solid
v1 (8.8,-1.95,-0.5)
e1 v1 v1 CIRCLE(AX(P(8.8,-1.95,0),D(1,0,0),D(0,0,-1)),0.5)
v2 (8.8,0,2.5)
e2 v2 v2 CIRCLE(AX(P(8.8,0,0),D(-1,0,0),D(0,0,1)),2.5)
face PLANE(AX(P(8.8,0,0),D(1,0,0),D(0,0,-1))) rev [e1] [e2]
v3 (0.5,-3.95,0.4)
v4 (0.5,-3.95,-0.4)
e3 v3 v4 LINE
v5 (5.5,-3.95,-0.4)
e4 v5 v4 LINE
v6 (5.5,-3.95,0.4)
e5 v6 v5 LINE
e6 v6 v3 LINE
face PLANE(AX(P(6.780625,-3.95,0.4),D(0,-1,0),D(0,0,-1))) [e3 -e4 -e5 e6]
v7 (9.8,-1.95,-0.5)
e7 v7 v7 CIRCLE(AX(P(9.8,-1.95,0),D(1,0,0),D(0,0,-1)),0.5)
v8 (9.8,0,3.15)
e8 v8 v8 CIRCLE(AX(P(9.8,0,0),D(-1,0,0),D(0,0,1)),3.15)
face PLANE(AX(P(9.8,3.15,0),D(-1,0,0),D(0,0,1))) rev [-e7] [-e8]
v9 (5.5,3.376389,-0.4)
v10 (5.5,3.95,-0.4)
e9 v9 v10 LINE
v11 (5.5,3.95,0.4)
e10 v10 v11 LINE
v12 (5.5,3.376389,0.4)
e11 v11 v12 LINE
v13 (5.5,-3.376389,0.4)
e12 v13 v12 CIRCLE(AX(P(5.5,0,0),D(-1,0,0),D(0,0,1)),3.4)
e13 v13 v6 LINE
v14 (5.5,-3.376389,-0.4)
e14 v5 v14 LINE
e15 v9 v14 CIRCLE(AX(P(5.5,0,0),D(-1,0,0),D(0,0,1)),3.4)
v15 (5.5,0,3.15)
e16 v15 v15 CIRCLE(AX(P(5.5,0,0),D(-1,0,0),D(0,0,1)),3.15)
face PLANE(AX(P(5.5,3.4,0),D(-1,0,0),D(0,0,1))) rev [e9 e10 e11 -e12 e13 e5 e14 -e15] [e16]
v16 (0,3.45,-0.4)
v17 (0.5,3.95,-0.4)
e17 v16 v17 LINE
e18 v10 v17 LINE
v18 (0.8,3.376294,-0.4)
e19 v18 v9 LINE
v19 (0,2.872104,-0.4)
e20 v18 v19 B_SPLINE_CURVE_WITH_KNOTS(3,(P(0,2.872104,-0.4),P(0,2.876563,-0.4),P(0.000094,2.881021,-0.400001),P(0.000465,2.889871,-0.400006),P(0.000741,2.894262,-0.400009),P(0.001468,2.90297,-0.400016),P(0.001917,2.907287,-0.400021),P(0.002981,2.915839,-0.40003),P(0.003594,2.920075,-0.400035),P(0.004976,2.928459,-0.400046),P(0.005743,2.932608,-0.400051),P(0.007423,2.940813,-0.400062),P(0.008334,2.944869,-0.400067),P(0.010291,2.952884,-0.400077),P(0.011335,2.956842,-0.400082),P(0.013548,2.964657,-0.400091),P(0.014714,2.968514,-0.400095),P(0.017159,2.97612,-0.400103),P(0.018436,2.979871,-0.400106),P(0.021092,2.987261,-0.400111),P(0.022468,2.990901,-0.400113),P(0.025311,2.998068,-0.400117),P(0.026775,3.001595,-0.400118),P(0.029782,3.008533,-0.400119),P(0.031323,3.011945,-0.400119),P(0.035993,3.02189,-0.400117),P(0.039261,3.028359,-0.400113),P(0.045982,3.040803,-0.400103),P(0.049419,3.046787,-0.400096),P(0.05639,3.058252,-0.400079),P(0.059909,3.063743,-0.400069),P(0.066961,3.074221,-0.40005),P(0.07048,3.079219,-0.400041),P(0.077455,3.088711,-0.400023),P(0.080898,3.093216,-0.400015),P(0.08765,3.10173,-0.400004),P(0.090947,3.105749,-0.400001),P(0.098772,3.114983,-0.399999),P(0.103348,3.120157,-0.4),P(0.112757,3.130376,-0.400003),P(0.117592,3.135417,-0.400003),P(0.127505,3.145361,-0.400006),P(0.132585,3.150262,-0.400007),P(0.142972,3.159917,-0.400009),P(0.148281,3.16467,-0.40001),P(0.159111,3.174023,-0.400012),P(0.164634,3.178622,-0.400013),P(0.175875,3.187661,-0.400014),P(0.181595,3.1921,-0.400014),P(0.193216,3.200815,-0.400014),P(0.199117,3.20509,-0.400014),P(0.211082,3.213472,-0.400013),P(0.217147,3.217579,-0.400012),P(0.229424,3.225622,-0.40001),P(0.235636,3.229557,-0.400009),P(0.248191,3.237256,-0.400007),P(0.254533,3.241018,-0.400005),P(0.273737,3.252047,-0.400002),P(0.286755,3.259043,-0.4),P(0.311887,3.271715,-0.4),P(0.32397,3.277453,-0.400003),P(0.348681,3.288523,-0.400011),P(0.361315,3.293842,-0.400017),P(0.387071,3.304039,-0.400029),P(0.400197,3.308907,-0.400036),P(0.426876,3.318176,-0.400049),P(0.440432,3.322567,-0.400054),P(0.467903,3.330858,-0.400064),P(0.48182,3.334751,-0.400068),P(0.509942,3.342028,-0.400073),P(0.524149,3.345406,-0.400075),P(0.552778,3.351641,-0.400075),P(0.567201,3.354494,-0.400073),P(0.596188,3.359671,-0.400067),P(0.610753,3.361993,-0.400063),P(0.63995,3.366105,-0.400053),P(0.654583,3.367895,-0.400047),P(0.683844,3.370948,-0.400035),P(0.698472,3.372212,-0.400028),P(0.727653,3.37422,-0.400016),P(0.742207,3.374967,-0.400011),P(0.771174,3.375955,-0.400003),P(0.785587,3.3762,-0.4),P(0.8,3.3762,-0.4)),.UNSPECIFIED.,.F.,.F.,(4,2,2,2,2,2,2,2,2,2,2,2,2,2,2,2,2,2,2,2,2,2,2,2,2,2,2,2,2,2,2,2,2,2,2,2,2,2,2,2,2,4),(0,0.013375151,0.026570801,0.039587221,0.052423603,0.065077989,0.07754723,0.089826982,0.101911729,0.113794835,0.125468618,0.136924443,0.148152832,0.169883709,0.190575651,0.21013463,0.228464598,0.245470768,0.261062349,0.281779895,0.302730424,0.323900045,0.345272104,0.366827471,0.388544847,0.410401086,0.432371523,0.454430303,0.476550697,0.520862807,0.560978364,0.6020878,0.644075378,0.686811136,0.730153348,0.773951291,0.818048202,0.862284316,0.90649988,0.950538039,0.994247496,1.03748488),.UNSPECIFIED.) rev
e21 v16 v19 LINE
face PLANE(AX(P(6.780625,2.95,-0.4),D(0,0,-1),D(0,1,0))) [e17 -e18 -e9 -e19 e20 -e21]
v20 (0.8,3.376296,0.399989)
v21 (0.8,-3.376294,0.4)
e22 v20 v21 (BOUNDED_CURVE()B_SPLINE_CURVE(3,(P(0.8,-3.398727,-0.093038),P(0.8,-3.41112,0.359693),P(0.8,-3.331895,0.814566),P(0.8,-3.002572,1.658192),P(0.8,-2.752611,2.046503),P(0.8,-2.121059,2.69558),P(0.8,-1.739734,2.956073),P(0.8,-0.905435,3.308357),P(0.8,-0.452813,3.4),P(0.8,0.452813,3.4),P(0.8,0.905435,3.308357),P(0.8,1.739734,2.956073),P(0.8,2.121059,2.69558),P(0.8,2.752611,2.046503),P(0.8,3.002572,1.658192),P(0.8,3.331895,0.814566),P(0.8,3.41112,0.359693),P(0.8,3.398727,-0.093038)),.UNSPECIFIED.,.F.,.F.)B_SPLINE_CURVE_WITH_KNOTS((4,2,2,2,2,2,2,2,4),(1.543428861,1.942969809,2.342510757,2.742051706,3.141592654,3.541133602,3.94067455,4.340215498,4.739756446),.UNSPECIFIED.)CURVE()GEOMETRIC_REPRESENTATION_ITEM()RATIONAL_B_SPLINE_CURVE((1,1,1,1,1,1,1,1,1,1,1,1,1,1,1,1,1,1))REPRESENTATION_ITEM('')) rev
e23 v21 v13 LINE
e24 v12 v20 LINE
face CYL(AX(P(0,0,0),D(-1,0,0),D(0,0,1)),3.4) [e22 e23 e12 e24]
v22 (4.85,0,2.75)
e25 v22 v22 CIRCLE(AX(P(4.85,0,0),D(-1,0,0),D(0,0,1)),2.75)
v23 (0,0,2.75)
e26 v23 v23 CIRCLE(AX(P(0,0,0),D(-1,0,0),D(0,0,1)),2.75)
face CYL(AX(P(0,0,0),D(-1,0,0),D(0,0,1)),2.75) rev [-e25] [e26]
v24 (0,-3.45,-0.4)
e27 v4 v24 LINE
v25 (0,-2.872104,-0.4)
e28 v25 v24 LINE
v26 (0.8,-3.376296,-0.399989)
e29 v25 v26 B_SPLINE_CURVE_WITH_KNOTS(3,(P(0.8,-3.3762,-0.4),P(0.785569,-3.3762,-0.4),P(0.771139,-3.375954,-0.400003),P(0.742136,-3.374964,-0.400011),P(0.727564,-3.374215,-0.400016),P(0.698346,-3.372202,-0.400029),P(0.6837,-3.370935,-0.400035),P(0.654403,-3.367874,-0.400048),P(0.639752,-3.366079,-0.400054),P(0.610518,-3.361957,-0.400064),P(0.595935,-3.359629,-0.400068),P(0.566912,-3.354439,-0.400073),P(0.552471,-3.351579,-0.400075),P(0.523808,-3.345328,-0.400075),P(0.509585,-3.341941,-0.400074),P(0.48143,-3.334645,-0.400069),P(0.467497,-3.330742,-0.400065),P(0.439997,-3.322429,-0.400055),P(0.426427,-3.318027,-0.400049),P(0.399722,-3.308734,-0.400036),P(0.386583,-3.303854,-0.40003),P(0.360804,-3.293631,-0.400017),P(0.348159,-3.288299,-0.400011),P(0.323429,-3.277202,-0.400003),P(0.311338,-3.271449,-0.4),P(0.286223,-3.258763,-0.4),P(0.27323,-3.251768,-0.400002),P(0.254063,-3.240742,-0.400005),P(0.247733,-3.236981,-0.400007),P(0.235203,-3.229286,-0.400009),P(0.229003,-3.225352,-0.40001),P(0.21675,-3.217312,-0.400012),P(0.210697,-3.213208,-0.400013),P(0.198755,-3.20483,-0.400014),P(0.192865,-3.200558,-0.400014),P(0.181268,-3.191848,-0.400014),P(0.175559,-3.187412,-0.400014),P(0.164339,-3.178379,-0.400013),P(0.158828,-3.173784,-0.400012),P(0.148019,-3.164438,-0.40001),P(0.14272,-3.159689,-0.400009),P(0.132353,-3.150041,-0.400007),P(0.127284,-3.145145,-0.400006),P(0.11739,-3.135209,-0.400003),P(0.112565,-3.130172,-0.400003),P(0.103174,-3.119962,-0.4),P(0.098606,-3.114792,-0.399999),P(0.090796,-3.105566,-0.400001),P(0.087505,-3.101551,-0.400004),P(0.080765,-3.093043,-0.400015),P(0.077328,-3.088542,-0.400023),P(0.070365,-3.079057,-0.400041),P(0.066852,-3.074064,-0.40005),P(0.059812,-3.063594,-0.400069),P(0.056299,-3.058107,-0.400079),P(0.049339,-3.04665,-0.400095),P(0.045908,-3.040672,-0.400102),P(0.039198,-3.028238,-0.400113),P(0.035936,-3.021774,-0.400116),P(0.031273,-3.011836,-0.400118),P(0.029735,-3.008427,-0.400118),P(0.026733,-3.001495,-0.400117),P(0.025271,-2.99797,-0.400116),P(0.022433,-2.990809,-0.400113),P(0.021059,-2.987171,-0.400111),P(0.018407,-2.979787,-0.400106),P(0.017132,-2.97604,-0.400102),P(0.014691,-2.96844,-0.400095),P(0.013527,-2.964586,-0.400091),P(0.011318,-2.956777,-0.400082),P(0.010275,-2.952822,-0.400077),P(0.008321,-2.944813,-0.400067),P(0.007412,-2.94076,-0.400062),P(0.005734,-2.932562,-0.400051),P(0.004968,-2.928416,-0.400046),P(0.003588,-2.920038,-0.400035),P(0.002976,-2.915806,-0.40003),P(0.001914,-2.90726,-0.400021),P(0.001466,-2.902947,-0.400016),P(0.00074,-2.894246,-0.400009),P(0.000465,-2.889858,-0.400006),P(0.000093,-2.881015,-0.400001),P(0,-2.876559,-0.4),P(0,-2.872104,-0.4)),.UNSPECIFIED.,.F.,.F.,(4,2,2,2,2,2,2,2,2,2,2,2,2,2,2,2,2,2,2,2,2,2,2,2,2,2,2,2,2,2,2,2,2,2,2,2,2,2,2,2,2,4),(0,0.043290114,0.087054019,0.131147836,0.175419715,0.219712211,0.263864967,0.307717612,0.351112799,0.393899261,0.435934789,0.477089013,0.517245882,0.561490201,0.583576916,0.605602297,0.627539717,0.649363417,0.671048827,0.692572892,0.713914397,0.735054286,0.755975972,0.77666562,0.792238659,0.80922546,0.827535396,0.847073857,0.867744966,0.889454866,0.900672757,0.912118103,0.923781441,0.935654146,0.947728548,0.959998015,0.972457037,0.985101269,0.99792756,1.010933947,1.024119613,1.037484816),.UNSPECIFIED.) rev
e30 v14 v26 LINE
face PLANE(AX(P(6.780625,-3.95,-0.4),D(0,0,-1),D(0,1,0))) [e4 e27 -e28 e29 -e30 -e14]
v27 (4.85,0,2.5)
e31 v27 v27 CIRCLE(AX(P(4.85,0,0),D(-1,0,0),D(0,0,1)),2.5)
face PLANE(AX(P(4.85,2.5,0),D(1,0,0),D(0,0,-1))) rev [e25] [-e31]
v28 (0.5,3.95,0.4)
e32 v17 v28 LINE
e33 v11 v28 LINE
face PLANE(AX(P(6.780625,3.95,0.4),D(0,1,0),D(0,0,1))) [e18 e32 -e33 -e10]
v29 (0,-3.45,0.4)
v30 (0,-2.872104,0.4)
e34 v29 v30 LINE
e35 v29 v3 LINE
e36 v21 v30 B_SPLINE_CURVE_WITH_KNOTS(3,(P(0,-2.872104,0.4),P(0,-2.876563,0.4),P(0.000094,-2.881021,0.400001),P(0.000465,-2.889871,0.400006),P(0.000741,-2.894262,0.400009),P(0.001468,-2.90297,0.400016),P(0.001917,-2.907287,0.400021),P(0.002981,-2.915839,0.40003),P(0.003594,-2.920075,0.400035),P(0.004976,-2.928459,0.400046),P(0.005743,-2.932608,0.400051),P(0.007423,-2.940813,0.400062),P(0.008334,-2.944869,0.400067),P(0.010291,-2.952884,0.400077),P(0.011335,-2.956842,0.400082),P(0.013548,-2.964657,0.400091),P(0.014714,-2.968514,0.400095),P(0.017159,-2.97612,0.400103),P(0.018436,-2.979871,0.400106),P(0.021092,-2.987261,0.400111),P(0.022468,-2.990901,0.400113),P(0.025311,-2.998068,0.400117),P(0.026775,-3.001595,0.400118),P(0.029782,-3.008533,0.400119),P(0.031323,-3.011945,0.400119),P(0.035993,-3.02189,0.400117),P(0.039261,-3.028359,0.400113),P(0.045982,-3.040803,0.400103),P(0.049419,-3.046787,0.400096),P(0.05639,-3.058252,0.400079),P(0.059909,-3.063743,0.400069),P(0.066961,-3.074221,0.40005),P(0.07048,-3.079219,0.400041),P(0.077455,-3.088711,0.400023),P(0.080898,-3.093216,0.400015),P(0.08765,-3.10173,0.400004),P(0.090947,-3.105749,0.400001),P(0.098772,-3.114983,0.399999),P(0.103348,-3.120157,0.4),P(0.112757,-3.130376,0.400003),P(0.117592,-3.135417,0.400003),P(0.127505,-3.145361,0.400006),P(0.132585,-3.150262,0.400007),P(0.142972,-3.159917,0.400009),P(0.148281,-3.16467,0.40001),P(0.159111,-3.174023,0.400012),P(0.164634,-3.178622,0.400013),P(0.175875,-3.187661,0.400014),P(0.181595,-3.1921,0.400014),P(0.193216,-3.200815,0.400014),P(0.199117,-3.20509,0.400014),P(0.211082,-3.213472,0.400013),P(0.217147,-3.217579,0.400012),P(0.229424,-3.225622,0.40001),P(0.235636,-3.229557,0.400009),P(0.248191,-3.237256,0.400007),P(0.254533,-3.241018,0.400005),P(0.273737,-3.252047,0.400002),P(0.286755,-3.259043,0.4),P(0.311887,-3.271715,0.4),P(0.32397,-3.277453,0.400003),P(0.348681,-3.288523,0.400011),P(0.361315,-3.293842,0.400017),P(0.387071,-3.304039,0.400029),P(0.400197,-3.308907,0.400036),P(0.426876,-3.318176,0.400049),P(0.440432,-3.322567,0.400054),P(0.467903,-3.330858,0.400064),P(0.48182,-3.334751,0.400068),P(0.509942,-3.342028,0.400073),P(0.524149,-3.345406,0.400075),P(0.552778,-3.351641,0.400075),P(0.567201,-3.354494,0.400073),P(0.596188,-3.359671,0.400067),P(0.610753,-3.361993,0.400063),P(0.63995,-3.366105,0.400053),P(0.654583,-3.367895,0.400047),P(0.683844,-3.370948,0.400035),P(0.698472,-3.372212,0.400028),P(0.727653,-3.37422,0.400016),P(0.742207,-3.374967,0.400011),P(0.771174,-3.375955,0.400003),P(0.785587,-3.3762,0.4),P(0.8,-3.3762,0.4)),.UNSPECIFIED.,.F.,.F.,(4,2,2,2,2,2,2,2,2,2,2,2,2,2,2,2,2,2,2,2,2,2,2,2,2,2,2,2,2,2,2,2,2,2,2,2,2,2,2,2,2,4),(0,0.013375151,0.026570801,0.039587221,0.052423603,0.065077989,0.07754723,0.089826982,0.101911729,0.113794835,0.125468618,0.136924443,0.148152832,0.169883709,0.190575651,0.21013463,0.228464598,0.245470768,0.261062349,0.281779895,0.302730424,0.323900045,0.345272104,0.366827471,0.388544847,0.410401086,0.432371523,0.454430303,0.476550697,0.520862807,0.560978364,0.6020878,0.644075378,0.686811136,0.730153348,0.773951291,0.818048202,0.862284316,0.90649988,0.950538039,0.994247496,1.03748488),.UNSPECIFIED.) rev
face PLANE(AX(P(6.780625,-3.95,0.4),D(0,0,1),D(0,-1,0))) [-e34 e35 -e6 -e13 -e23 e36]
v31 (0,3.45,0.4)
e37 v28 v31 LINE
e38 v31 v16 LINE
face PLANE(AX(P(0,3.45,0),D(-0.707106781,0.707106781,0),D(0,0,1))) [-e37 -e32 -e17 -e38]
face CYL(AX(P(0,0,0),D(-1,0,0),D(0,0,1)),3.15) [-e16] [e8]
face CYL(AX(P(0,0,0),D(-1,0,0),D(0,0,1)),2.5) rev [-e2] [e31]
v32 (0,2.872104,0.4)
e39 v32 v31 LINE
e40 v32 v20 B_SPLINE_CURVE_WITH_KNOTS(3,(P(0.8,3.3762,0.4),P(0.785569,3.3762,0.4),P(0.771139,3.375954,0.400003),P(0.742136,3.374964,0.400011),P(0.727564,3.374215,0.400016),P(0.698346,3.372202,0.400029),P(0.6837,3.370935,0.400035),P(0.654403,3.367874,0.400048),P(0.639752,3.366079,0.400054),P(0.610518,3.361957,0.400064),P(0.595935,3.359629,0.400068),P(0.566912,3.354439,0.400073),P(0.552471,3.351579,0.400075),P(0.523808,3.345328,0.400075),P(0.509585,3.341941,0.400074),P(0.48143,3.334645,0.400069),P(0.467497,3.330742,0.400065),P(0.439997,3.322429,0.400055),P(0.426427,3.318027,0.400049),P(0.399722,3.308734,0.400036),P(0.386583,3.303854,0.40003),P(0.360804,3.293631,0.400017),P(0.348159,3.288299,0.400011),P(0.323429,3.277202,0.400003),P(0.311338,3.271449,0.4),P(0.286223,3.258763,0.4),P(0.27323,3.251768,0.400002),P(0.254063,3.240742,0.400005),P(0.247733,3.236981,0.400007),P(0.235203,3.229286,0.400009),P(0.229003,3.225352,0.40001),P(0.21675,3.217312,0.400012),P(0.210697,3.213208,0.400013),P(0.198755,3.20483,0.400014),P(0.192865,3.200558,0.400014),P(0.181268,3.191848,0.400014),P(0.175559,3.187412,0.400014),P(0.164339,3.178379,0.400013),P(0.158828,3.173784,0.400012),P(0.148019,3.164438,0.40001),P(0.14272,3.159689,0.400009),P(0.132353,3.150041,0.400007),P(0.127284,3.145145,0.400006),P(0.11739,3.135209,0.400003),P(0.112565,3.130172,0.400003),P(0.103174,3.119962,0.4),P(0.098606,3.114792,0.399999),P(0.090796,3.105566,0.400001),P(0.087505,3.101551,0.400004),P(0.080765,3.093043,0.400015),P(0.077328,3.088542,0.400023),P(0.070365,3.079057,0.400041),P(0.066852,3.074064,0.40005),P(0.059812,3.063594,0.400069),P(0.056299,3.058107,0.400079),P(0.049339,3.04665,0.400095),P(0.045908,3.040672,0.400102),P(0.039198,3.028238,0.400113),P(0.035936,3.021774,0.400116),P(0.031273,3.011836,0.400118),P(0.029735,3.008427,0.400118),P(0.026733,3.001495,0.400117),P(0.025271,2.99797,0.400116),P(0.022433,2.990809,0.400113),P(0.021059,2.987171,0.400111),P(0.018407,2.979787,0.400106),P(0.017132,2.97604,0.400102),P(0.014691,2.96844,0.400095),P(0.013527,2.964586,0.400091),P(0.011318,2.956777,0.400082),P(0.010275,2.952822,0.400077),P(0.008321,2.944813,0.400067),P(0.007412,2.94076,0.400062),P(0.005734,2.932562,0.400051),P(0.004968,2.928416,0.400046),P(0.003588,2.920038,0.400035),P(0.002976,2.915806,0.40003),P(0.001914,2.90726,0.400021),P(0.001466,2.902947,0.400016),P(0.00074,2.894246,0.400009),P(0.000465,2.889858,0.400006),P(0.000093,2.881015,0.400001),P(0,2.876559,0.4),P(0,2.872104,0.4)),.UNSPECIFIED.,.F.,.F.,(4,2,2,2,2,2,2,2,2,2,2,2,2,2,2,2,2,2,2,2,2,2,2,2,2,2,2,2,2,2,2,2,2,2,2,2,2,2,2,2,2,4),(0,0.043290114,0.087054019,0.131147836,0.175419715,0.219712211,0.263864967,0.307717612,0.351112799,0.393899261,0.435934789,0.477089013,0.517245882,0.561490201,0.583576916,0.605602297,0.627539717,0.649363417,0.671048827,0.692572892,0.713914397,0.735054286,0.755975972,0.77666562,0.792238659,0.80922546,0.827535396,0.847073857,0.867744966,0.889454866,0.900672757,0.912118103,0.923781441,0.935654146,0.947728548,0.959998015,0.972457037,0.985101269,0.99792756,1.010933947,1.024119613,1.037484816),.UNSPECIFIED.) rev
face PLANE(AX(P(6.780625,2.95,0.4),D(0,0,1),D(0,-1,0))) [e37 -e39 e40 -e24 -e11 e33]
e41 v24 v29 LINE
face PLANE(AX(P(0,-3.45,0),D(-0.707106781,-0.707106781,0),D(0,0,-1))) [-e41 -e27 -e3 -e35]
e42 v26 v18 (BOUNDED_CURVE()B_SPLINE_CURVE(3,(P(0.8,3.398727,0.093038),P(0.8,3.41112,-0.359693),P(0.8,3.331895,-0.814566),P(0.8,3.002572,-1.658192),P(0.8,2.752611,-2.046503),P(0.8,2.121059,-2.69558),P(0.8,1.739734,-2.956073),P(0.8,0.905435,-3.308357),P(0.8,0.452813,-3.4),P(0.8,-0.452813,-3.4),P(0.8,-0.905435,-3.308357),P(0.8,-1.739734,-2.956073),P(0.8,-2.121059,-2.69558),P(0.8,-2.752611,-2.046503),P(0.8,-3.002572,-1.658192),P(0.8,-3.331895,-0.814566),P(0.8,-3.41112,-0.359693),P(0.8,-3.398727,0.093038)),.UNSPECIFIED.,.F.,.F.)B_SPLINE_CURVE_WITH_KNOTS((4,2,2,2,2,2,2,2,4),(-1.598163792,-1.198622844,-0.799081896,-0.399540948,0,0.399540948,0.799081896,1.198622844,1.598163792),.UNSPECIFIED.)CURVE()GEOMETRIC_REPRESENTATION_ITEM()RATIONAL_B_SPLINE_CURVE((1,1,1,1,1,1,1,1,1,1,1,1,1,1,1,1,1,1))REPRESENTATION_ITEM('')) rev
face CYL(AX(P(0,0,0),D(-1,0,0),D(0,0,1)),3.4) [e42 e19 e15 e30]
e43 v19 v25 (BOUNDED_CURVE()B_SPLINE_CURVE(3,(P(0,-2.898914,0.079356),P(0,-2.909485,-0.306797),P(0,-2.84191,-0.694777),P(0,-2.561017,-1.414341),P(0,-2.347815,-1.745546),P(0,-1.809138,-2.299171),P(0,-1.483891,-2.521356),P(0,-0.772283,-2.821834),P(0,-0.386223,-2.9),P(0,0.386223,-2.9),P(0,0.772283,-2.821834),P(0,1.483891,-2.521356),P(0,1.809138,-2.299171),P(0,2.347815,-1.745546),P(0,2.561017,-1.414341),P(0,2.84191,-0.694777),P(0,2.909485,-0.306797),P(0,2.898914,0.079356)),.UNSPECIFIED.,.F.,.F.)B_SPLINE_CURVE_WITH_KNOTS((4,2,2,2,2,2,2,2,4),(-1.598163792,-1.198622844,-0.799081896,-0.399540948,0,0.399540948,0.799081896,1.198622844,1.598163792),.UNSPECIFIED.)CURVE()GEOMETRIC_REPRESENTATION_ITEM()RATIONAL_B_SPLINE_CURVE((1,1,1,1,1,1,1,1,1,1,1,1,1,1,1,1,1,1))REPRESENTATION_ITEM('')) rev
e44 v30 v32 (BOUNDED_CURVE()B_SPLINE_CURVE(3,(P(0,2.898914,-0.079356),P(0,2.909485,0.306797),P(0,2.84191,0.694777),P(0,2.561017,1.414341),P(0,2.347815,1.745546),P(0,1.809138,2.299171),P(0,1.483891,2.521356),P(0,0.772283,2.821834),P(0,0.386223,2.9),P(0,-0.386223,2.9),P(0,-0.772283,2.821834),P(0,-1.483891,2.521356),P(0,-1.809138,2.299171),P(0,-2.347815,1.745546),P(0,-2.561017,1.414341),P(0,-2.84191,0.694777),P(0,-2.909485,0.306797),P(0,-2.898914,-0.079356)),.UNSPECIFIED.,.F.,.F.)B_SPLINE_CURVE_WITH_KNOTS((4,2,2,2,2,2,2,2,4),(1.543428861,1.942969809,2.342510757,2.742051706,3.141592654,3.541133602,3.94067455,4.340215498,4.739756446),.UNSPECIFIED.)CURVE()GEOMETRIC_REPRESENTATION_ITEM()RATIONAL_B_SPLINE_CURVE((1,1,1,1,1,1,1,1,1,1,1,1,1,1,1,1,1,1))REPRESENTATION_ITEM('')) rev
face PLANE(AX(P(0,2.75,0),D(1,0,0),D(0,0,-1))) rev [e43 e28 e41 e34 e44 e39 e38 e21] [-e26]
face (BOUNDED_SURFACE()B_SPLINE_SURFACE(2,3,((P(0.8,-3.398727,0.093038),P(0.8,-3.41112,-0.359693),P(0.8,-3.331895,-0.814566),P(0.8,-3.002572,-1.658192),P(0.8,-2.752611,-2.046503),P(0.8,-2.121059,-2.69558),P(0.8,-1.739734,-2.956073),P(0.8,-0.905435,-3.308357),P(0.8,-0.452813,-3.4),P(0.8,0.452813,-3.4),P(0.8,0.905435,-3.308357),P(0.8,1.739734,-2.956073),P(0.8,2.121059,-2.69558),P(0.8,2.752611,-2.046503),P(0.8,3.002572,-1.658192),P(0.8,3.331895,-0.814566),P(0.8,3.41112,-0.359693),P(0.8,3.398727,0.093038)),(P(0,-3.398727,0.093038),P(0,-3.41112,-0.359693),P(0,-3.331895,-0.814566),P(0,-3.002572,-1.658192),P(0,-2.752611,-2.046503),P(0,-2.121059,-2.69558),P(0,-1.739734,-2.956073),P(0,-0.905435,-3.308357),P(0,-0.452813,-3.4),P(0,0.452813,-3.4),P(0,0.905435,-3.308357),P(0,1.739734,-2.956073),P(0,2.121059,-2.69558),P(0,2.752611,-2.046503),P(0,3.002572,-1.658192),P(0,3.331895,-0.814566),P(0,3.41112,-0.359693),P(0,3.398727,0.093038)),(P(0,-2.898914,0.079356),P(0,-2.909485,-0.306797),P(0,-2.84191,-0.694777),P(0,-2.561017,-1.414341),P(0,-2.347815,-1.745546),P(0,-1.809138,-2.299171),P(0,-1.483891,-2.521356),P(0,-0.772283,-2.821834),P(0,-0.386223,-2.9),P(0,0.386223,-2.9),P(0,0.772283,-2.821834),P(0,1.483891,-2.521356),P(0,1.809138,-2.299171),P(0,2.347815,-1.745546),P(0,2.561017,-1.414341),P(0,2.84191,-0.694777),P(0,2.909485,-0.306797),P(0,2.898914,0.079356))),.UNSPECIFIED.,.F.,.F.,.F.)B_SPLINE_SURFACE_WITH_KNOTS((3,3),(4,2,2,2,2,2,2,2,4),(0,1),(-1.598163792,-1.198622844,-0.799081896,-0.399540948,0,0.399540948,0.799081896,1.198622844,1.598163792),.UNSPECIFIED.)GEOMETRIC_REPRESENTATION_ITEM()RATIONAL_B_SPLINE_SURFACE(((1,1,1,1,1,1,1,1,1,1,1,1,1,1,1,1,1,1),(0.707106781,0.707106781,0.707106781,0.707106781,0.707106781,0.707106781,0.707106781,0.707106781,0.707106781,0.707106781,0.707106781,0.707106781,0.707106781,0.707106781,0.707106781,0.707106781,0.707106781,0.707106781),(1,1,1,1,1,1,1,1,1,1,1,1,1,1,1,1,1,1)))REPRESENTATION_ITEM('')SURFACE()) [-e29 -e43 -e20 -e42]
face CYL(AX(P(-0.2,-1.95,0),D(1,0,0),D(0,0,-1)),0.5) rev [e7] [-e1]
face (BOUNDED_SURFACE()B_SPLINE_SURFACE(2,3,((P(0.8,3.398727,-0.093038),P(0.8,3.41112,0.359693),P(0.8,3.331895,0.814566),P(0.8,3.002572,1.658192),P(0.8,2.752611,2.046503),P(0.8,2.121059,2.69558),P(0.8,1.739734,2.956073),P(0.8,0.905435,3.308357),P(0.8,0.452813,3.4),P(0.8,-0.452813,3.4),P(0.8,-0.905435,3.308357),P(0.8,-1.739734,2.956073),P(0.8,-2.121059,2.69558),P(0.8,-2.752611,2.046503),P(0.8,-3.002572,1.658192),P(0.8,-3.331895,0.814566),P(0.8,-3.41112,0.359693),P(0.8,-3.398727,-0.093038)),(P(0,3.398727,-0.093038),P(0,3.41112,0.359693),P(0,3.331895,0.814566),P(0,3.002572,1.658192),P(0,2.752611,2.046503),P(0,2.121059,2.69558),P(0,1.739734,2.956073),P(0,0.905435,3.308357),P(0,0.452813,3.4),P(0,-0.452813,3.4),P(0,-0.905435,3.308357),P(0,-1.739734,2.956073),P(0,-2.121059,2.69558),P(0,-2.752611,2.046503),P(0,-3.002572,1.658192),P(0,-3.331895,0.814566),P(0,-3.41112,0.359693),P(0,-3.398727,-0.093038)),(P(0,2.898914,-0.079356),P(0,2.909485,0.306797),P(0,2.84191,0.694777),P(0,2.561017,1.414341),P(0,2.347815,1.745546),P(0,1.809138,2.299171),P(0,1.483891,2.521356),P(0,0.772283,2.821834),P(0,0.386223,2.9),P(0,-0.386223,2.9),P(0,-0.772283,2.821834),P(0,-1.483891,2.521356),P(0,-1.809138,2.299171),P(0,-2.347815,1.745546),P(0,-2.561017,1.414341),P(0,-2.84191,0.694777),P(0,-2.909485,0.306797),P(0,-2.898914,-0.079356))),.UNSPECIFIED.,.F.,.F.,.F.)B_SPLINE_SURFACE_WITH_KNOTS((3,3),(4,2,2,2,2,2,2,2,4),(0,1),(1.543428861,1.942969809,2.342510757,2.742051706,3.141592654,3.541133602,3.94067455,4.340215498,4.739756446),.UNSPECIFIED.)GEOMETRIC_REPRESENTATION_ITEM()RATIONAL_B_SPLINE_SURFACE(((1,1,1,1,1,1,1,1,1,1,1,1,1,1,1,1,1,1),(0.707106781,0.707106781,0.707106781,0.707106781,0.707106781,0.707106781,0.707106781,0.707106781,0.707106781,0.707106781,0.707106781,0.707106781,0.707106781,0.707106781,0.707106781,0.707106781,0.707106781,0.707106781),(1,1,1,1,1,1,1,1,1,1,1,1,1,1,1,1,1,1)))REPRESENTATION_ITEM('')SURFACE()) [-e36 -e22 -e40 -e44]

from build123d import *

# Parameters (mm, degrees)
SKETCH2_W           = 0.8
SKETCH2_H           = 1
BOSS_EXTRUDE1_DEPTH = 5.5
CHAMFER1_SIZE       = 0.5
FILLET1_SIZE        = 0.5
FILLET1_SIZE_2      = 0.8
SKETCH3_R           = 0.5
CUT_EXTRUDE1_DEPTH  = 10


with BuildPart() as part:
    # Sketch1 → Revolve1 (revolve)
    with BuildSketch(Plane.XY, mode=Mode.PRIVATE) as revolve1_sk:
        Polygon((8.8, 0), (8.8, 2.5), (4.85, 2.5), (4.85, 2.75), (0, 2.75), (0, 3.4), (5.5, 3.4), (5.5, 3.15), (9.8, 3.15), (9.8, 0), align=None)
    revolve(revolve1_sk.sketch.rotate(Axis((0, 0, 0), (1, 0, 0)), 90), axis=Axis((0, 0, 0), (1, 0, 0)))

    # Sketch2 → Boss-Extrude1 (add)
    with BuildSketch(Plane.ZY):
        with Locations((0, 3.45)):
            Rectangle(SKETCH2_W, SKETCH2_H)
        with Locations((0, -3.45)):
            Rectangle(SKETCH2_W, SKETCH2_H)
    extrude(amount=-BOSS_EXTRUDE1_DEPTH)

    # Chamfer1
    chamfer1_edges = [part.edges().sort_by_distance(p)[0] for p in [
        (0, 3.95, 0),
        (0, -3.95, 0),
    ]]
    chamfer(chamfer1_edges, length=CHAMFER1_SIZE)

    # Fillet1
    # an asymmetric fillet: 0.8, 0.5 mm, written as the material it takes off along each edge
    with BuildSketch(Plane(origin=(0, 0, 0), x_dir=(0, -0.8910585432976912, -0.45388839202627373), z_dir=(0, 0.45388839202627373, -0.8910585432976912))) as fillet1_piece_1_section:
        with BuildLine():
            Bezier((3.4 - FILLET1_SIZE, 0), (3.4, 0), (3.4, -FILLET1_SIZE_2), weights=[1, 0.707106781, 1])
            Line((3.4, -FILLET1_SIZE_2), (3.4, 0))
            Line((3.4, 0), (3.4 - FILLET1_SIZE, 0))
        make_face()
    fillet1_piece_1 = revolve(axis=Axis((0, 0, 0), (-1, 0, 0)), revolution_arc=233.986868401, mode=Mode.PRIVATE)
    fillet1_piece_1 = split(fillet1_piece_1, bisect_by=Plane(origin=(0.182093779, -3.13232652, -0.4), z_dir=(0, 0, -1)), keep=Keep.TOP, mode=Mode.PRIVATE)
    add(fillet1_piece_1, mode=Mode.SUBTRACT)
    with BuildSketch(Plane(origin=(0, 0, 0), x_dir=(0, -0.8910585432976912, -0.45388839202627373), z_dir=(0, 0.45388839202627373, -0.8910585432976912))) as fillet1_piece_2_section:
        with BuildLine():
            Bezier((3.4 - FILLET1_SIZE, 0), (3.4, 0), (3.4, -FILLET1_SIZE_2), weights=[1, 0.707106781, 1])
            Line((3.4, -FILLET1_SIZE_2), (3.4, 0))
            Line((3.4, 0), (3.4 - FILLET1_SIZE, 0))
        make_face()
    fillet1_piece_2 = revolve(axis=Axis((0, 0, 0), (-1, 0, 0)), revolution_arc=233.986868401, mode=Mode.PRIVATE)
    fillet1_piece_2 = split(fillet1_piece_2, bisect_by=Plane(origin=(0.229357983, 0, 0.4), z_dir=(0, 0, 1)), keep=Keep.TOP, mode=Mode.PRIVATE)
    add(fillet1_piece_2, mode=Mode.SUBTRACT)
    with BuildSketch(Plane(origin=(0, 0, 0), x_dir=(0, -0.8910585432977036, 0.4538883920262497), z_dir=(0, 0.4538883920262497, 0.8910585432977036))) as fillet1_piece_3_section:
        with BuildLine():
            Bezier((3.4 - FILLET1_SIZE, 0), (3.4, 0), (3.4, FILLET1_SIZE_2), weights=[1, 0.707106781, 1])
            Line((3.4, FILLET1_SIZE_2), (3.4, 0))
            Line((3.4, 0), (3.4 - FILLET1_SIZE, 0))
        make_face()
    fillet1_piece_3 = revolve(axis=Axis((0, 0, 0), (1, 0, 0)), revolution_arc=233.986868401, mode=Mode.PRIVATE)
    fillet1_piece_3 = split(fillet1_piece_3, bisect_by=Plane(origin=(0.18209405, -3.132326501, 0.4), z_dir=(0, 0, 1)), keep=Keep.TOP, mode=Mode.PRIVATE)
    add(fillet1_piece_3, mode=Mode.SUBTRACT)
    with BuildSketch(Plane(origin=(0, 0, 0), x_dir=(0, -0.8910585432977036, 0.4538883920262497), z_dir=(0, 0.4538883920262497, 0.8910585432977036))) as fillet1_piece_4_section:
        with BuildLine():
            Bezier((3.4 - FILLET1_SIZE, 0), (3.4, 0), (3.4, FILLET1_SIZE_2), weights=[1, 0.707106781, 1])
            Line((3.4, FILLET1_SIZE_2), (3.4, 0))
            Line((3.4, 0), (3.4 - FILLET1_SIZE, 0))
        make_face()
    fillet1_piece_4 = revolve(axis=Axis((0, 0, 0), (1, 0, 0)), revolution_arc=233.986868401, mode=Mode.PRIVATE)
    fillet1_piece_4 = split(fillet1_piece_4, bisect_by=Plane(origin=(0.229357983, 0, -0.4), z_dir=(0, 0, -1)), keep=Keep.TOP, mode=Mode.PRIVATE)
    add(fillet1_piece_4, mode=Mode.SUBTRACT)

    # Sketch3 → Cut-Extrude1 (cut)
    with BuildSketch(Plane(origin=(9.8, 0, 0), x_dir=(0, 0, -1), z_dir=(1, 0, 0))):
        with Locations((0, -1.95)):
            Circle(SKETCH3_R)
    extrude(amount=-CUT_EXTRUDE1_DEPTH, mode=Mode.SUBTRACT)


solid = part.part
